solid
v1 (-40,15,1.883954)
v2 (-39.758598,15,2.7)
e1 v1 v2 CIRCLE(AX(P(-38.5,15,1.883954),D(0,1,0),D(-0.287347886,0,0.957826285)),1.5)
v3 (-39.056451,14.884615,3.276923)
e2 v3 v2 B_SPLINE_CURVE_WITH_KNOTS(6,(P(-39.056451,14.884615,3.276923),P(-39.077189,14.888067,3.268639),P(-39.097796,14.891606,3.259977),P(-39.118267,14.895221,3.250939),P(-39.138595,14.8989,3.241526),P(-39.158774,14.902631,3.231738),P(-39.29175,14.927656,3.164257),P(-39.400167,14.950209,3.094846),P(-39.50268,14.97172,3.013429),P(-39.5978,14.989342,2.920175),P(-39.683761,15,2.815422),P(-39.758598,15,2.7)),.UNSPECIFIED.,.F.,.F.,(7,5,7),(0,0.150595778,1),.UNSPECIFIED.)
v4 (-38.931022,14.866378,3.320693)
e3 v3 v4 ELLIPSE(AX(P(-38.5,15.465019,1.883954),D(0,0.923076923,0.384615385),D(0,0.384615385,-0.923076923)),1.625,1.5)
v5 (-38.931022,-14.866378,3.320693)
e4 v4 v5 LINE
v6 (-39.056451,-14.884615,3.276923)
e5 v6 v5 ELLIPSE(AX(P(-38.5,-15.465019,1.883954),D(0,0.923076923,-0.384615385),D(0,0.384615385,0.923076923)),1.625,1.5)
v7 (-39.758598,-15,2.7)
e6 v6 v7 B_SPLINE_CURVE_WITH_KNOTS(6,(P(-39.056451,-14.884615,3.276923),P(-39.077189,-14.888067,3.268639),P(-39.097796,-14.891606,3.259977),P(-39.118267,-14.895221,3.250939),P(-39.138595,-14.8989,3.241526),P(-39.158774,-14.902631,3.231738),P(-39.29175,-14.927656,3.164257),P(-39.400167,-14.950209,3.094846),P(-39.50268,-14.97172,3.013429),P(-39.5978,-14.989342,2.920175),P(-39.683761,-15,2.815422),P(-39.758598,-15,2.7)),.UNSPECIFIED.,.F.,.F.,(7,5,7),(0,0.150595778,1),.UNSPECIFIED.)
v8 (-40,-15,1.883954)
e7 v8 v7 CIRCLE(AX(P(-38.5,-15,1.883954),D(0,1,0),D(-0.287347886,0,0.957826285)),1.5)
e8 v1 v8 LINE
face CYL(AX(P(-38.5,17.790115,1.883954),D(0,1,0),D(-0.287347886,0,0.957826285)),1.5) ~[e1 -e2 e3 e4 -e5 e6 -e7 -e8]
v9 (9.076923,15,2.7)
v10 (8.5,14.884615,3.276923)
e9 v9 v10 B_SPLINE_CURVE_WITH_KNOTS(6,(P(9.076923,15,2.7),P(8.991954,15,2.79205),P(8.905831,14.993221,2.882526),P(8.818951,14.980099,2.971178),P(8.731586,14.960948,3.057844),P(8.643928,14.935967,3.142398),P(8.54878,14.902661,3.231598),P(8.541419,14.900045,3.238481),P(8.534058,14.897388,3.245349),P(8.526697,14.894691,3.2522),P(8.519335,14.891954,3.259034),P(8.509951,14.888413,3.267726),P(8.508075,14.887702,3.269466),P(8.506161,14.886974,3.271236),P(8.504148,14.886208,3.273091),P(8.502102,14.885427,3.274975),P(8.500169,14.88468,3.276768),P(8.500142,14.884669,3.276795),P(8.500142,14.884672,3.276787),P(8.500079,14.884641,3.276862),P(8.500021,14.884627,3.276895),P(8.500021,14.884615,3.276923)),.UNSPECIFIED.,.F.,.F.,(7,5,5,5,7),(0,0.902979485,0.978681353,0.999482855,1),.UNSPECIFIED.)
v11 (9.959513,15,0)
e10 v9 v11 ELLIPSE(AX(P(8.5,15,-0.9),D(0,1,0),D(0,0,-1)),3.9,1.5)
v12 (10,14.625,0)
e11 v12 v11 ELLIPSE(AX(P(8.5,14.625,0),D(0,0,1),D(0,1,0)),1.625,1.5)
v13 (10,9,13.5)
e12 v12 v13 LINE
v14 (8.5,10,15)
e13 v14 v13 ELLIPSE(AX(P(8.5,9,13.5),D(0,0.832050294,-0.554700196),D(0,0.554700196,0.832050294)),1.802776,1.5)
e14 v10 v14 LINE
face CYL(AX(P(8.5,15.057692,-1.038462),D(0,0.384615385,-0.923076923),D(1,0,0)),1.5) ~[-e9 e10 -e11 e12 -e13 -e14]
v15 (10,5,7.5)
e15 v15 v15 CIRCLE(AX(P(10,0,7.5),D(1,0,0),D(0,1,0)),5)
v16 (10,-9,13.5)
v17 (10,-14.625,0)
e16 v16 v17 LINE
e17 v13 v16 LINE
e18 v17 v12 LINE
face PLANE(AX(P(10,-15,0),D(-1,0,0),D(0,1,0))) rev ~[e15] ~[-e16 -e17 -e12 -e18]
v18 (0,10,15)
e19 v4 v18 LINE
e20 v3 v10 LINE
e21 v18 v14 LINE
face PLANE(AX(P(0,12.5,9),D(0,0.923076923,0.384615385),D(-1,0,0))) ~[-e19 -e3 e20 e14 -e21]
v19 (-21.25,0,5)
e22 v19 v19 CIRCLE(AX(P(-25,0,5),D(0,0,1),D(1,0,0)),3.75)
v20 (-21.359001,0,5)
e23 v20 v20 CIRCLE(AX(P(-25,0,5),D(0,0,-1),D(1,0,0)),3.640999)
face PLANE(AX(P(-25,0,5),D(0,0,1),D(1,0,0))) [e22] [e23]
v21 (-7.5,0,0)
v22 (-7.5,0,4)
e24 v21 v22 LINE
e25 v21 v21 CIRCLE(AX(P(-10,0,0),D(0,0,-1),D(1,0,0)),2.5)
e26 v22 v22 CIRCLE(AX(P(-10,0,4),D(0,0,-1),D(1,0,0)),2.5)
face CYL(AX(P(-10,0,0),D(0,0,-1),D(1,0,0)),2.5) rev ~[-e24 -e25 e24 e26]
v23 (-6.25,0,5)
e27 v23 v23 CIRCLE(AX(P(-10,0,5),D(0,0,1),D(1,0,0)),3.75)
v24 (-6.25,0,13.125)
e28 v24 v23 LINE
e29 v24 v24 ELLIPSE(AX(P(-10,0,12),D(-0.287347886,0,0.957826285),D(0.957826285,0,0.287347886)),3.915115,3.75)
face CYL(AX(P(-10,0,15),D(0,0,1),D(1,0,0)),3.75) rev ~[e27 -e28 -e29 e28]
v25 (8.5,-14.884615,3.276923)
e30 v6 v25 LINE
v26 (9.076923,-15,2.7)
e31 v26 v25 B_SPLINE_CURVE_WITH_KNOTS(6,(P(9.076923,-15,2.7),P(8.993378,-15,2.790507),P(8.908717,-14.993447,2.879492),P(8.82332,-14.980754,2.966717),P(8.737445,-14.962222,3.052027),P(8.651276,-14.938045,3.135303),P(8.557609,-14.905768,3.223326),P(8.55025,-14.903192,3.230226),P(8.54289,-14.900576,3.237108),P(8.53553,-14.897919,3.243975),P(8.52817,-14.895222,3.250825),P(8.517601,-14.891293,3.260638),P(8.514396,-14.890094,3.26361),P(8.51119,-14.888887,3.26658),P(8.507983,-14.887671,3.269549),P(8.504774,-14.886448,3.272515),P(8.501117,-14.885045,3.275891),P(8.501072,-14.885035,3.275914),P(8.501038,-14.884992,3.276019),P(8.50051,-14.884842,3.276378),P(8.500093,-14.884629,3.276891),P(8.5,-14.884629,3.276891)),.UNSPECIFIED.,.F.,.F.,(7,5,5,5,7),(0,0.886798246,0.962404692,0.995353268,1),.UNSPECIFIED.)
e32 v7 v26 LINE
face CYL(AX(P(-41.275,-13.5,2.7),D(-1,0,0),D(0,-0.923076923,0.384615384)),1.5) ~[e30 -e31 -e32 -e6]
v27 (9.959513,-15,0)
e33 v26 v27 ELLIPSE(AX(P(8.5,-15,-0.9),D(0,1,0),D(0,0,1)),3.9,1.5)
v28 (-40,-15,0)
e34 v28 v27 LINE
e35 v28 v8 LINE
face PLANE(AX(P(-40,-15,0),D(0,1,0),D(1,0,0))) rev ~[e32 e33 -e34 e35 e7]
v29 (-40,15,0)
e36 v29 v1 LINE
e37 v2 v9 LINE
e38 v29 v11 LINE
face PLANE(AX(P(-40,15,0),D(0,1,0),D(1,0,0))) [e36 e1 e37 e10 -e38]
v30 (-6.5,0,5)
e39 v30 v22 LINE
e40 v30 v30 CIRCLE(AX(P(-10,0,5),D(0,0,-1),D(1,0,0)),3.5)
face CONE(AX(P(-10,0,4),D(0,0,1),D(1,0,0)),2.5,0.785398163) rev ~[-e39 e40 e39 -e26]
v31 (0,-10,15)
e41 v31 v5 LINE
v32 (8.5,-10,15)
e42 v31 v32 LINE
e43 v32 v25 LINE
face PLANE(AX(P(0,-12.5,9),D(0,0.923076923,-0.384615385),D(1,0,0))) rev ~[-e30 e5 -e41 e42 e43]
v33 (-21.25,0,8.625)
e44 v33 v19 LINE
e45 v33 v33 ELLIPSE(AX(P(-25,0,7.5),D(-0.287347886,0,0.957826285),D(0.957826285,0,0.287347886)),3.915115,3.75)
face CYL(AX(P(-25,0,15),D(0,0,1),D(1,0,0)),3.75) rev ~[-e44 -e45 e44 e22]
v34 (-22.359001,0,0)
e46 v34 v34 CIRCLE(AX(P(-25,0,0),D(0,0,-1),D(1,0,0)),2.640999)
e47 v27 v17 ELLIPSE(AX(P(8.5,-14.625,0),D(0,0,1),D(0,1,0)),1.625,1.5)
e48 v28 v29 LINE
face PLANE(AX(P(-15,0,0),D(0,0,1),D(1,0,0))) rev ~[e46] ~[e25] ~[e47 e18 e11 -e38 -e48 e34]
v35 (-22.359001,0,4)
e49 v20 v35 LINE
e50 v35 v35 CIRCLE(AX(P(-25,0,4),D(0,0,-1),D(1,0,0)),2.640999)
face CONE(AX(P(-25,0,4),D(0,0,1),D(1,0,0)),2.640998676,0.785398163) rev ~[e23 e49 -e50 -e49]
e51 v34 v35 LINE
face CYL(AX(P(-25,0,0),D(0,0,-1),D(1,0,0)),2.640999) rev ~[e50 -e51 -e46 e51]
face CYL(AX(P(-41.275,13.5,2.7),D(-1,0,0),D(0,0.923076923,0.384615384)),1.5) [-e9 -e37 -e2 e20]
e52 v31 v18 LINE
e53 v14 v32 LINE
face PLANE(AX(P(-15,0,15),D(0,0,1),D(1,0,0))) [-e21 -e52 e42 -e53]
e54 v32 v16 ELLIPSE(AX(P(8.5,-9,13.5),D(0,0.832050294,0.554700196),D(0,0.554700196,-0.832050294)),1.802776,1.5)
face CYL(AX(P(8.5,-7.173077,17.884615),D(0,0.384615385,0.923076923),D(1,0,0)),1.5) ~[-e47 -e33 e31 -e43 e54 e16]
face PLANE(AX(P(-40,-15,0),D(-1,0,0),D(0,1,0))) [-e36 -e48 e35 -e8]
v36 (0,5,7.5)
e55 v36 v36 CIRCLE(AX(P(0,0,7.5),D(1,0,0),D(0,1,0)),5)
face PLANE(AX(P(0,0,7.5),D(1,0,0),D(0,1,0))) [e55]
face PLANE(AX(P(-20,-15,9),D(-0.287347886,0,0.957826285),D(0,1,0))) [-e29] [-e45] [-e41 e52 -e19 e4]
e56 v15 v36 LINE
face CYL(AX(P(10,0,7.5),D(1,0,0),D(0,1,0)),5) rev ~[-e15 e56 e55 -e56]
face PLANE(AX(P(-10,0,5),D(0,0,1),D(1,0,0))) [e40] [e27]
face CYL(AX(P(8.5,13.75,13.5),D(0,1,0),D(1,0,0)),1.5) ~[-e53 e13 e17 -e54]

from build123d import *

# Parameters (mm, degrees)
F0_W        = 50
F0_H        = 30
F1_DEPTH    = 15
F2_SIZE2    = 12
F2_SIZE     = 40
F3_C1_SIZE2 = 5
F3_C1_SIZE  = 12
F3_C2_SIZE2 = 12
F3_C2_SIZE  = 5
F5_T1_DEPTH = 35.5802298817
F5_T3_DEPTH = 52.025
F5_T5_DEPTH = 27.5
F5_T7_DEPTH = 20.5
F5_T9_DEPTH = 20.5
F6_R        = 5
F7_DEPTH    = 10
F8_R        = 2.5
F8_R_2      = 2.6409986757
F9_DEPTH    = 40
F10_R       = 3.75
F11_DEPTH   = 10
F12_SIZE    = 1


# Not quite as in the source:
# - a fillet or chamfer that OpenCascade refuses, or shapes differently, is made with other operations: its cross-section is extruded or revolved along the edge and cut away or added
# - two fillets or chamfers of one size are made in one step


with BuildPart() as f1:
    # F0 (on Top) → F1 (new body)
    with BuildSketch(Plane.XY):
        with Locations((-15, 0)):
            Rectangle(F0_W, F0_H)
    extrude(amount=F1_DEPTH)

    # F2
    f2_edges = [f1.edges().sort_by_distance(p)[0] for p in [
        (-40, 0, 15),
    ]]
    f2_side = f1.faces().sort_by_distance((-15, 0, 15))[0]
    chamfer(f2_edges, length=F2_SIZE, length2=F2_SIZE2, reference=f2_side)

    # F3: chamfer of 12 x 5 on 2 edges, made by hand

    # F3_c1
    f3_c1_edges = [f1.edges().sort_by_distance(p)[0] for p in [
        (5, 15, 15),
    ]]
    f3_c1_side = f1.faces().sort_by_distance((5, 15, 14.9))[0]
    chamfer(f3_c1_edges, length=F3_C1_SIZE, length2=F3_C1_SIZE2, reference=f3_c1_side)

    # F3_c2
    f3_c2_edges = [f1.edges().sort_by_distance(p)[0] for p in [
        (5, -15, 15),
    ]]
    f3_c2_side = f1.faces().sort_by_distance((5, -14.9, 15))[0]
    chamfer(f3_c2_edges, length=F3_C2_SIZE, length2=F3_C2_SIZE2, reference=f3_c2_side)

    # F5: fillet of radius 1.5 on 6 edges, made by hand

    # F5_s2 → F5_t1 (cut)
    with BuildSketch(Plane.XZ.offset(-17.7901149408)):
        with BuildLine():
            ThreePointArc((-38.9310218283, 3.3206934515), (-39.7034393924, 2.7793498181), (-40, 1.8839540237))
            Line((-40, 1.8839540237), (-40, 3))
            Line((-40, 3), (-38.9310218283, 3.3206934515))
        make_face()
    extrude(amount=F5_T1_DEPTH, mode=Mode.SUBTRACT)

    # F5_s4 → F5_t3 (cut)
    with BuildSketch(Plane.YZ.offset(-41.275)):
        with BuildLine():
            ThreePointArc((14.8846153846, 3.2769230769), (14.9708710135, 2.9941742027), (15, 2.7))
            Line((15, 2.7), (15, 3))
            Line((15, 3), (14.8846153846, 3.2769230769))
        make_face()
        with BuildLine():
            ThreePointArc((-14.8846153846, 3.2769230769), (-14.9708710135, 2.9941742027), (-15, 2.7))
            Line((-15, 2.7), (-15, 3))
            Line((-15, 3), (-14.8846153846, 3.2769230769))
        make_face()
    extrude(amount=F5_T3_DEPTH, mode=Mode.SUBTRACT)

    # F5_s6 → F5_t5 (cut)
    with BuildSketch(Plane.XZ.offset(-13.75)):
        with BuildLine():
            ThreePointArc((10, 13.5), (9.5606601718, 14.5606601718), (8.5, 15))
            Line((8.5, 15), (10, 15))
            Line((10, 15), (10, 13.5))
        make_face()
    extrude(amount=F5_T5_DEPTH, mode=Mode.SUBTRACT)

    # F5_s8 → F5_t7 (cut)
    with BuildSketch(Plane(origin=(0, 2.5961538462, -6.2307692308), x_dir=(1, 0, 0), z_dir=(0, -0.3846153846, 0.9230769231))):
        with BuildLine():
            ThreePointArc((10, 13.5), (9.5606601718, 14.5606601718), (8.5, 15))
            Line((8.5, 15), (10, 15))
            Line((10, 15), (10, 13.5))
        make_face()
    extrude(amount=F5_T7_DEPTH, mode=Mode.SUBTRACT)

    # F5_s10 → F5_t9 (cut)
    with BuildSketch(Plane(origin=(0, 5.2884615385, 12.6923076923), x_dir=(1, 0, 0), z_dir=(0, -0.3846153846, -0.9230769231))):
        with BuildLine():
            ThreePointArc((10, 13.5), (9.5606601718, 14.5606601718), (8.5, 15))
            Line((8.5, 15), (10, 15))
            Line((10, 15), (10, 13.5))
        make_face()
    extrude(amount=F5_T9_DEPTH, mode=Mode.SUBTRACT)

    # F6 (on face) → F7 (cut)
    with BuildSketch(Plane.YZ.offset(10)):
        with Locations((0, 7.5)):
            Circle(F6_R)
    extrude(amount=-F7_DEPTH, mode=Mode.SUBTRACT)

    # F8 (on face) → F9 (cut)
    with BuildSketch(Plane(origin=(0, 0, 0), x_dir=(1, 0, 0), z_dir=(0, 0, -1))):
        with Locations((-10, 0)):
            Circle(F8_R)
        with Locations((-25, 0)):
            Circle(F8_R_2)
    extrude(amount=-F9_DEPTH, mode=Mode.SUBTRACT)

    # F10 (on face) → F11 (cut)
    with BuildSketch(Plane.XY.offset(15)):
        with Locations((-10, 0)):
            Circle(F10_R)
        with Locations((-25, 0)):
            Circle(F10_R)
    extrude(amount=-F11_DEPTH, mode=Mode.SUBTRACT)

    # F12
    f12_edges = [f1.edges().sort_by_distance(p)[0] for p in [
        (-27.640999, 0, 5),
        (-12.5, 0, 5),
    ]]
    chamfer(f12_edges, length=F12_SIZE)


solid = f1.part
